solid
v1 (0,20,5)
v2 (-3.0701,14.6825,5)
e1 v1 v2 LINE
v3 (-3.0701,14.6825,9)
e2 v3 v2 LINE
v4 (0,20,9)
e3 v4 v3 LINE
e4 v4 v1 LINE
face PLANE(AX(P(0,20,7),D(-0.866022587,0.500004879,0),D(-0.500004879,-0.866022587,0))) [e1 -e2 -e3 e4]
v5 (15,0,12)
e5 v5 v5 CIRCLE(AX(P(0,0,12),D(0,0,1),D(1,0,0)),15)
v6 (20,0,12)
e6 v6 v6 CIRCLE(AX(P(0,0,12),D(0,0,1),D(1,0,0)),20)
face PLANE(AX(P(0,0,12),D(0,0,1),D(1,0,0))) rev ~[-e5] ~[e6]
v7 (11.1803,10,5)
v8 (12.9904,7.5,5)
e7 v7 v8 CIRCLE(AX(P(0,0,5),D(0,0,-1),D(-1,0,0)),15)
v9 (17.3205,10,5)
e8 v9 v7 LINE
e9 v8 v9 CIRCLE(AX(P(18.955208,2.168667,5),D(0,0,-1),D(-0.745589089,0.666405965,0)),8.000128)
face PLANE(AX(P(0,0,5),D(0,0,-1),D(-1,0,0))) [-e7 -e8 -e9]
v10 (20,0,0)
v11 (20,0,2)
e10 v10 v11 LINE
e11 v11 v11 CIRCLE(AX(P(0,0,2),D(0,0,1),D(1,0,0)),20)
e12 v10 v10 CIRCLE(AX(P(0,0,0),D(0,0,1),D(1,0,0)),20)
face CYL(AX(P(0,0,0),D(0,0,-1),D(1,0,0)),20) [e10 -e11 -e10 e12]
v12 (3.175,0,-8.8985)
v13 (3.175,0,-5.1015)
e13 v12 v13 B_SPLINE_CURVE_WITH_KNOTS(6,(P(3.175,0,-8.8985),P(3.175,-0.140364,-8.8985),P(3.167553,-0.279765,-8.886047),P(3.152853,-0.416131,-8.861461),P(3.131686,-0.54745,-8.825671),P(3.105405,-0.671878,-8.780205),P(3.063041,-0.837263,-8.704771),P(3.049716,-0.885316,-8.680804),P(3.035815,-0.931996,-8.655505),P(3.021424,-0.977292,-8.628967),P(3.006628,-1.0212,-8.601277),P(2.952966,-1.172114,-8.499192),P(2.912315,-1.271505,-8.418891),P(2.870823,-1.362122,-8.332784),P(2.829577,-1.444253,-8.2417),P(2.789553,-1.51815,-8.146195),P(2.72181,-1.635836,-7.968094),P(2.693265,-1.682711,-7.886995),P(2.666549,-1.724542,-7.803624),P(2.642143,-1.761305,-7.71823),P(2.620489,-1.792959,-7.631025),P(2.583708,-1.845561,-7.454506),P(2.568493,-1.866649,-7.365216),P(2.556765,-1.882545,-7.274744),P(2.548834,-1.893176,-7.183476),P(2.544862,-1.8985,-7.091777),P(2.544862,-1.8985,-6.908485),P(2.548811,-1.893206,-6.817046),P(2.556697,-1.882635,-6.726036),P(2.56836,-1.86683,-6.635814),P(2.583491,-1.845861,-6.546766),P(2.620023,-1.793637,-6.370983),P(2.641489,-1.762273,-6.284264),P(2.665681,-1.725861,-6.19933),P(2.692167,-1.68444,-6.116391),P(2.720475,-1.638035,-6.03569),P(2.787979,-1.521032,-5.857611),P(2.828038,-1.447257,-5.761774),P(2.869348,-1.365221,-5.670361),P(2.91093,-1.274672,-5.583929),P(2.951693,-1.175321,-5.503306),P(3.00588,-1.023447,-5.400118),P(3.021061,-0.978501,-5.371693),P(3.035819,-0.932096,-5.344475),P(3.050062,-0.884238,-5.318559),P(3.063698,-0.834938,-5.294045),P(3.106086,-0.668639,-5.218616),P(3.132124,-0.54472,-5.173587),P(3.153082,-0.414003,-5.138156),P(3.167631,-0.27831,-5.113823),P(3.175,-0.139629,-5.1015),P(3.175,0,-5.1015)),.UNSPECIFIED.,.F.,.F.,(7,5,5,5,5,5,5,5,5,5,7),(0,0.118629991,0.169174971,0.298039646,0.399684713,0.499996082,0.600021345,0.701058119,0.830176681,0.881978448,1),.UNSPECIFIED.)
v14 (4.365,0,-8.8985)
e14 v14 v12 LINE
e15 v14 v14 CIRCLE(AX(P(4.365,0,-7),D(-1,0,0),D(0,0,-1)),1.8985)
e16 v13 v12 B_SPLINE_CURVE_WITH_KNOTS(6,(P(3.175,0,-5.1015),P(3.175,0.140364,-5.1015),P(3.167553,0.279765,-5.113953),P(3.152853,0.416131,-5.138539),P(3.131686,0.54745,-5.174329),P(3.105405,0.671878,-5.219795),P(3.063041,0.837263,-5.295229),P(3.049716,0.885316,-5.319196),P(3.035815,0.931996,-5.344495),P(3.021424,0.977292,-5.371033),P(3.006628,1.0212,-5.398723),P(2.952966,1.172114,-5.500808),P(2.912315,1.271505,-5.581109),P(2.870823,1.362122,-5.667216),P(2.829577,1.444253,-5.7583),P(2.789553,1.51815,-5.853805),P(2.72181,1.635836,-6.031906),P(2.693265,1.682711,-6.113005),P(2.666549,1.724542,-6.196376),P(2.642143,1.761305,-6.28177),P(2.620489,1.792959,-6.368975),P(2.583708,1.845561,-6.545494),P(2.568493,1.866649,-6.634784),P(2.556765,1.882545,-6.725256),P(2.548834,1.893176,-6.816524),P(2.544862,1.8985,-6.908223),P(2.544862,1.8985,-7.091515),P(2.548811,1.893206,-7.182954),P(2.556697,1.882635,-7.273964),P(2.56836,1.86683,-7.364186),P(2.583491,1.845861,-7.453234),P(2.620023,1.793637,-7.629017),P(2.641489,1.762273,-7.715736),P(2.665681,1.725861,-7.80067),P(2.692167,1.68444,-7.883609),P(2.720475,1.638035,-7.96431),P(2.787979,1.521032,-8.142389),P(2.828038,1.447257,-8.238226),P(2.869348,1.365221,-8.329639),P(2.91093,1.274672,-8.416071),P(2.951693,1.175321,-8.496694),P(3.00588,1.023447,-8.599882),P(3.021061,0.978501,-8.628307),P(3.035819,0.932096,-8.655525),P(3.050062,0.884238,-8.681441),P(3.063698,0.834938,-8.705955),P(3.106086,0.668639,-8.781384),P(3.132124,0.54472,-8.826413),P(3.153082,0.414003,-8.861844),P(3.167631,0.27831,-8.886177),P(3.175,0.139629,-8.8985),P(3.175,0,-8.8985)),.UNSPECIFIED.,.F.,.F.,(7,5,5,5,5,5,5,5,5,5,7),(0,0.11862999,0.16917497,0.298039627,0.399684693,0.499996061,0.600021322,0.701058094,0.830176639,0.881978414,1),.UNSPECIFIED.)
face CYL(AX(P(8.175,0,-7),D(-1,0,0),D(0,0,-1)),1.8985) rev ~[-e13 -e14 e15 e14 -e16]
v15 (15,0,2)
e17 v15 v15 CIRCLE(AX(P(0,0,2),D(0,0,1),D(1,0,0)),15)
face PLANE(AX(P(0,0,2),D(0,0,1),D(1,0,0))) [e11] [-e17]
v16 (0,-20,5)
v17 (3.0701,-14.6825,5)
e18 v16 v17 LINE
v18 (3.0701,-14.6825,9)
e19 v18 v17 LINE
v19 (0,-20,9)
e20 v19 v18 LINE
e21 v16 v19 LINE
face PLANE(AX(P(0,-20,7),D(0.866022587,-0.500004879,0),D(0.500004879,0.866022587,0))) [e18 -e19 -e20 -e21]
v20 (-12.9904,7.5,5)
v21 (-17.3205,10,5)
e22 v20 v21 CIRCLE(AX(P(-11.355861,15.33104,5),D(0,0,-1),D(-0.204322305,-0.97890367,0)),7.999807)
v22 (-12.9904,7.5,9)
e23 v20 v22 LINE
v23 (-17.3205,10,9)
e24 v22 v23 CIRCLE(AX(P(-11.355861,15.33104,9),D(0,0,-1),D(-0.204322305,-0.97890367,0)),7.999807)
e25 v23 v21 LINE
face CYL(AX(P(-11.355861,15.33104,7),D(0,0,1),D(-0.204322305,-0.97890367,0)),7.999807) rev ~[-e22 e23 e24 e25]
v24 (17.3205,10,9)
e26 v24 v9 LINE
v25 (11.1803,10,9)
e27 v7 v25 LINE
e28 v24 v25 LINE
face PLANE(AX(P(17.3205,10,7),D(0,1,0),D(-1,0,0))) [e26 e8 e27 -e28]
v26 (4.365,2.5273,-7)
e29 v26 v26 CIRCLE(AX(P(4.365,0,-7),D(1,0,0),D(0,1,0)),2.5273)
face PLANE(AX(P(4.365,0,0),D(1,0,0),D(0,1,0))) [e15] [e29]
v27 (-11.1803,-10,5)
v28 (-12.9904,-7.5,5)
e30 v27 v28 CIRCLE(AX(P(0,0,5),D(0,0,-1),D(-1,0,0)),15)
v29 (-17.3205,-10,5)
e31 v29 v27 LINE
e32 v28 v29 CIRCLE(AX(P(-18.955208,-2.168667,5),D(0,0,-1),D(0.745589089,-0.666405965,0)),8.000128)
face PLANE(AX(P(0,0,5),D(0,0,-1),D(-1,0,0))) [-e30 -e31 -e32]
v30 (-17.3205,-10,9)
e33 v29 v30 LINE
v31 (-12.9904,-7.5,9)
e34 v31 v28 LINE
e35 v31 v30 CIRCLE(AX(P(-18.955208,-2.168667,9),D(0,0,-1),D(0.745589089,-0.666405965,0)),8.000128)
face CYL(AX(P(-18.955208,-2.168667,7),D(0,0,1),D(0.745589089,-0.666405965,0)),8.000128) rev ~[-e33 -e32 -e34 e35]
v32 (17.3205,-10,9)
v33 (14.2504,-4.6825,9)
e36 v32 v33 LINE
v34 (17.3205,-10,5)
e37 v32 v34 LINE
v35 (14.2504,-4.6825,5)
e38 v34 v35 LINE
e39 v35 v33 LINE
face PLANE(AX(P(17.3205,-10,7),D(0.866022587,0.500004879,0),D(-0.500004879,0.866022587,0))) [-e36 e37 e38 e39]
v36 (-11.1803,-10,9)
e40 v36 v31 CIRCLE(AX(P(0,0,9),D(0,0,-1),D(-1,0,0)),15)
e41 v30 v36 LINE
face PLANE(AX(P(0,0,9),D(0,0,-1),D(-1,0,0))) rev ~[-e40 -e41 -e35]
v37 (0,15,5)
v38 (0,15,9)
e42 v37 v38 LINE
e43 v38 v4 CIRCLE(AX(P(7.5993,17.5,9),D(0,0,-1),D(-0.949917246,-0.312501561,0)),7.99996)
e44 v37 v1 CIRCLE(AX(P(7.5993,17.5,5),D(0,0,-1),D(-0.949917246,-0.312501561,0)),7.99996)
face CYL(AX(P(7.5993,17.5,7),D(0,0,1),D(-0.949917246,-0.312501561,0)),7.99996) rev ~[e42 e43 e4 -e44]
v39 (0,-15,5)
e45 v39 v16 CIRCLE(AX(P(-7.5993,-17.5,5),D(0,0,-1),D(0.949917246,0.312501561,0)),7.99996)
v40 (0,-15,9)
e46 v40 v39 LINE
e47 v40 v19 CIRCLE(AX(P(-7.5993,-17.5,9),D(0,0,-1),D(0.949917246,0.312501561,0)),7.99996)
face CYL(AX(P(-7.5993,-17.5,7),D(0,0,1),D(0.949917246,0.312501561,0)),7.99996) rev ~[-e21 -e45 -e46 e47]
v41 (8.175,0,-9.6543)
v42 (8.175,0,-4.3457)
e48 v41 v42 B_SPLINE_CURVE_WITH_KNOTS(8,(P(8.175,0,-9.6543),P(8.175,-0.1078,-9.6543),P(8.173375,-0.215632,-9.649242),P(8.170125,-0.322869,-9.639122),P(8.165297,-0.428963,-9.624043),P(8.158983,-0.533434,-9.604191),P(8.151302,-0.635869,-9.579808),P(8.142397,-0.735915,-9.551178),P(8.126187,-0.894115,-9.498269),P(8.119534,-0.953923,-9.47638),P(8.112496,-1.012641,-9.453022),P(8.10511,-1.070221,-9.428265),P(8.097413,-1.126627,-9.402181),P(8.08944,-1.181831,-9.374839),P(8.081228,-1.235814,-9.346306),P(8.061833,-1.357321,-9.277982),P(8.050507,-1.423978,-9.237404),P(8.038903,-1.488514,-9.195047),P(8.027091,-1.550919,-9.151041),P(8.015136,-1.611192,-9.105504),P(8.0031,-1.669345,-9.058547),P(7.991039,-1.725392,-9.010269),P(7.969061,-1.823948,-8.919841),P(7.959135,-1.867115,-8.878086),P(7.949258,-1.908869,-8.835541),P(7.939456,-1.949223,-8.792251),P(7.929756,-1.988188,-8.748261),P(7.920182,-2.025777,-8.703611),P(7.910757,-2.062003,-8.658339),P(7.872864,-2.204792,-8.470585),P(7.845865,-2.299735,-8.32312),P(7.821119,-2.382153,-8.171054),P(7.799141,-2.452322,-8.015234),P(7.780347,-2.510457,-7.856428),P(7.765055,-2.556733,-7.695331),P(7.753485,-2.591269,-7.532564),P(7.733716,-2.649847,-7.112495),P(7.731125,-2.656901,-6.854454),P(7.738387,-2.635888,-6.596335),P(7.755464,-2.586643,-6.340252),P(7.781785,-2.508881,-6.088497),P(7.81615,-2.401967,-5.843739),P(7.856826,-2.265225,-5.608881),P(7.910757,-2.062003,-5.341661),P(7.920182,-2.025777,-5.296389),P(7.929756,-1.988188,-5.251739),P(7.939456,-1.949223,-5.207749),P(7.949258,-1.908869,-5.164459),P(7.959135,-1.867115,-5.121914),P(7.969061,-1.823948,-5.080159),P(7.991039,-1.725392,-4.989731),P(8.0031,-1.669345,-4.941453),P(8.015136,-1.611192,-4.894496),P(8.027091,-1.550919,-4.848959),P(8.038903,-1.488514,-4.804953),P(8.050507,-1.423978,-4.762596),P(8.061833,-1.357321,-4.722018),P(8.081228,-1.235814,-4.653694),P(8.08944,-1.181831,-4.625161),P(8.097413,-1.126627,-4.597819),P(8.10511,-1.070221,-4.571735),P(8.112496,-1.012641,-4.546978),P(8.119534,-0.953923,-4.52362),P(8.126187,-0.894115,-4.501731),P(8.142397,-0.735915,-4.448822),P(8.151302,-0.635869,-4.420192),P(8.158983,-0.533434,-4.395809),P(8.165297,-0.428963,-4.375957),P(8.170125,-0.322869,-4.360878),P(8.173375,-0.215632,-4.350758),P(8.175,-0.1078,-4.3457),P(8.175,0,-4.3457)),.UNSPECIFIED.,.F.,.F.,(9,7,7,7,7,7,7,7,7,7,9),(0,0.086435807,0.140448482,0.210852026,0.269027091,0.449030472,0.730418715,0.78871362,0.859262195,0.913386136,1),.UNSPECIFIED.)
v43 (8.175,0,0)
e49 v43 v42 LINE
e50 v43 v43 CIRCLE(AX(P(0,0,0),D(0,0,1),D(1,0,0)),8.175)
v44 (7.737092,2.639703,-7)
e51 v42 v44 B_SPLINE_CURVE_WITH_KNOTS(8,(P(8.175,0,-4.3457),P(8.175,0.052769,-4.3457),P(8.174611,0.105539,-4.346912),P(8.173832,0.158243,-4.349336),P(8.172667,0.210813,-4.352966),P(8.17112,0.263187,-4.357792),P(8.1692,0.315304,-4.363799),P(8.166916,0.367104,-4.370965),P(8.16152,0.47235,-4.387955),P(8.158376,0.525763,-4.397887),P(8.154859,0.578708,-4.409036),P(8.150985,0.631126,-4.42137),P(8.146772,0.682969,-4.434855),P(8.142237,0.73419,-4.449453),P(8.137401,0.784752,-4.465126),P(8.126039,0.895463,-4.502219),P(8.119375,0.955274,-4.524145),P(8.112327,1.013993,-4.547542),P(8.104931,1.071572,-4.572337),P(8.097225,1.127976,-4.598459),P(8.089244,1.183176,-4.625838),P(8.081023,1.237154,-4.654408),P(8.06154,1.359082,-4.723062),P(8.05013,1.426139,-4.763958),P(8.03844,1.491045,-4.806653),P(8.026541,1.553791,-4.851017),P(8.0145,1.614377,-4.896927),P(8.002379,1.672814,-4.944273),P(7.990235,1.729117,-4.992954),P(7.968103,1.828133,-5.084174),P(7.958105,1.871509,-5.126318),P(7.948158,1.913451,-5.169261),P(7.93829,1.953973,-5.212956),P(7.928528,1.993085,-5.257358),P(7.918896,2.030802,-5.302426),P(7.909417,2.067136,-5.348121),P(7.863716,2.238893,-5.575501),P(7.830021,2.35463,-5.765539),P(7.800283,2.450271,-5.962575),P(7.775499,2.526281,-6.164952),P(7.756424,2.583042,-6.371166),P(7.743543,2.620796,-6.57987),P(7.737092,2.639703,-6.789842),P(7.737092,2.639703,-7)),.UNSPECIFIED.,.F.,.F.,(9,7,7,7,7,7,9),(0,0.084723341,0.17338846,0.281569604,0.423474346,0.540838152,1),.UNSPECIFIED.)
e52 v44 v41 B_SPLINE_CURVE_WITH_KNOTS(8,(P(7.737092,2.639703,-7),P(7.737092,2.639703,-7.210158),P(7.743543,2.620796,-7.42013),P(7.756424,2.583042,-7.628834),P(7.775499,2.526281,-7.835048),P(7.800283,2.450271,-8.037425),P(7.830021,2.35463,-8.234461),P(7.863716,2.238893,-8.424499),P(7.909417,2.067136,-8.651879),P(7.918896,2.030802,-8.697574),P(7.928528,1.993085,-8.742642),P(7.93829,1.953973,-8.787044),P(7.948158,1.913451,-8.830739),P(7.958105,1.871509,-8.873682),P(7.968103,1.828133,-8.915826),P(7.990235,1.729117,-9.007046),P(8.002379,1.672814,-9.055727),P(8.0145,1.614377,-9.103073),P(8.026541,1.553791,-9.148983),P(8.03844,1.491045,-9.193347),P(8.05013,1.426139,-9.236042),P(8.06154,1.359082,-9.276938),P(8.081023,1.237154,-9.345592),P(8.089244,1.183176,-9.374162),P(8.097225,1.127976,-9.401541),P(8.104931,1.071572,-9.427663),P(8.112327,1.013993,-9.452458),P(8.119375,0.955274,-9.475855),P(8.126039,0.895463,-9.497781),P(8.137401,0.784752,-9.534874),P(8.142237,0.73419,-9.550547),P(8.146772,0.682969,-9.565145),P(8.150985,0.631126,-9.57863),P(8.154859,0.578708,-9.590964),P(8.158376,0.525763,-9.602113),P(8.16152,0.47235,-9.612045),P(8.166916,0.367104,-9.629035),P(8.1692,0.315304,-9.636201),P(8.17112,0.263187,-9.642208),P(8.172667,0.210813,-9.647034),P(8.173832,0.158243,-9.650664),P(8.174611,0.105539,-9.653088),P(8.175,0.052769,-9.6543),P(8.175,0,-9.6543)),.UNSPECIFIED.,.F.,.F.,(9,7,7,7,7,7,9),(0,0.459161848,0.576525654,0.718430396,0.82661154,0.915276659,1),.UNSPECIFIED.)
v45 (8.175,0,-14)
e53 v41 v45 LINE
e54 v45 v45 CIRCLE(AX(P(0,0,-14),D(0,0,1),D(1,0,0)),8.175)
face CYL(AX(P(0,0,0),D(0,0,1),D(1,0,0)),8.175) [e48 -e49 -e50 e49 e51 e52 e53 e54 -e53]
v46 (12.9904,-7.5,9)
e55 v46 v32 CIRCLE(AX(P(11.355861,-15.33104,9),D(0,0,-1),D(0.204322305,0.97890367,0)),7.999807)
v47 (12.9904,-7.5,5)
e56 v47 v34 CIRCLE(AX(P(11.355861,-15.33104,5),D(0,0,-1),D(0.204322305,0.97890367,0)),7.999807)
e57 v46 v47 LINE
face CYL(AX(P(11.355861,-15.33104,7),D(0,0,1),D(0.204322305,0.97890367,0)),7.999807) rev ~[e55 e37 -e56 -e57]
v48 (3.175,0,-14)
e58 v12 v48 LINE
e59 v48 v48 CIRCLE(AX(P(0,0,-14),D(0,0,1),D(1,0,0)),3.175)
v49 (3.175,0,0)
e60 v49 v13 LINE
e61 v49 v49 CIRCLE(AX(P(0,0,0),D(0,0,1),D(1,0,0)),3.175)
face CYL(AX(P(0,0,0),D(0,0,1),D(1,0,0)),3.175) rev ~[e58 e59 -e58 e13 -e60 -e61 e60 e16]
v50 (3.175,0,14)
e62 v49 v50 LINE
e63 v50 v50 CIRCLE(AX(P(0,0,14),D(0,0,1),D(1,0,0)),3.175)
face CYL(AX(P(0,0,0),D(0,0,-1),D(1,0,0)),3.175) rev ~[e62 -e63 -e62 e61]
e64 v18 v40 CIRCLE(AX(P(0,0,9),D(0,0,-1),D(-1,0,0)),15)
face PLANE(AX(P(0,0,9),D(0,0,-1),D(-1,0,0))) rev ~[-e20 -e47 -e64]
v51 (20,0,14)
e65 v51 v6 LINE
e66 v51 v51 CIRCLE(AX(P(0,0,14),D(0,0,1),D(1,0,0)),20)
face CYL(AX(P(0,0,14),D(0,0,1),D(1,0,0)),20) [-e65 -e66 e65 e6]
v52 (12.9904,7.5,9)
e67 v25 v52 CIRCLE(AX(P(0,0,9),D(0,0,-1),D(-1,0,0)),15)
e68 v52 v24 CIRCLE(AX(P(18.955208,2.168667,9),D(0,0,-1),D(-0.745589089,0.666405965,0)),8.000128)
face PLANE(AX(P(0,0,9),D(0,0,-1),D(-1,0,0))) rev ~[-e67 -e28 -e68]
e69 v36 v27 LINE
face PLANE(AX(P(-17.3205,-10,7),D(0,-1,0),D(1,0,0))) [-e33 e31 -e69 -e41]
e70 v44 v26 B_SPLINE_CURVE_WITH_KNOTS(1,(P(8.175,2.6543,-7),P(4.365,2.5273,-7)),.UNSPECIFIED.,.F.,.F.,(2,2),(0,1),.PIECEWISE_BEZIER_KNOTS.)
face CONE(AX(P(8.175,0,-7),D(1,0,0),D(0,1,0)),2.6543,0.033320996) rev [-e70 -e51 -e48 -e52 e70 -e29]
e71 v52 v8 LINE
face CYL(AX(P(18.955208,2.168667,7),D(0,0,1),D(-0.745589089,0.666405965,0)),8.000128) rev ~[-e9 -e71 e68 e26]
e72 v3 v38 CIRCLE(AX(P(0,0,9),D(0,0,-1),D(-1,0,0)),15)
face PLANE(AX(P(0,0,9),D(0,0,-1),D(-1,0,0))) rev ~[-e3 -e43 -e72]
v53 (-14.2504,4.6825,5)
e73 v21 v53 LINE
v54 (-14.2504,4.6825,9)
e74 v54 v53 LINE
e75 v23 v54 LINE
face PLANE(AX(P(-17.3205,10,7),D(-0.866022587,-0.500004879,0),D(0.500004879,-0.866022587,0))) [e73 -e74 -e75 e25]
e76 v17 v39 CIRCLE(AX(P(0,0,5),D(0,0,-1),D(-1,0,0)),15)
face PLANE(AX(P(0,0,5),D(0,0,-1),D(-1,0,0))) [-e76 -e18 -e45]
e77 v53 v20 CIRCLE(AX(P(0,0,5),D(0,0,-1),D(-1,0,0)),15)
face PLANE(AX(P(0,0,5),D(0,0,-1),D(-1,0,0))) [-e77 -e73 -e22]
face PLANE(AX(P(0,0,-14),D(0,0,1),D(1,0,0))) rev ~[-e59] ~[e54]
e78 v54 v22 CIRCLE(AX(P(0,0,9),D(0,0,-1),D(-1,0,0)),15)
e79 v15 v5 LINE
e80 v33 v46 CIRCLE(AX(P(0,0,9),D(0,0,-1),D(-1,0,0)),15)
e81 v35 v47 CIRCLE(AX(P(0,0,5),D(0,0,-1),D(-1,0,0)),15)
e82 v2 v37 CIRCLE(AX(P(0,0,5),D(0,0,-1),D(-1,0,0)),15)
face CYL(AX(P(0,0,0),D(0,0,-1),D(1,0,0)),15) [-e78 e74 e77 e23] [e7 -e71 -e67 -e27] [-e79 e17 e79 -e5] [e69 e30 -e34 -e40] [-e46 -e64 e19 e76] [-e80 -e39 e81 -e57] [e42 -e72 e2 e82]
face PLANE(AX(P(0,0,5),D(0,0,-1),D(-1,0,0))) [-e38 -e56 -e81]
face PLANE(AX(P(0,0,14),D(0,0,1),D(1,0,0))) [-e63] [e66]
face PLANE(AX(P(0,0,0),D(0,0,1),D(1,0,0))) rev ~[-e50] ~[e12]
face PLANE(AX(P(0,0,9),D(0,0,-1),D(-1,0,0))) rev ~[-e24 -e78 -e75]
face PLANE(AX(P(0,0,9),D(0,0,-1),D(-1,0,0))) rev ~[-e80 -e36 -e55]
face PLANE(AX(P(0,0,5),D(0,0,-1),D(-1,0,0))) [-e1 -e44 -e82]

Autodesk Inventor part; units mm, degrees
ref_plane "XZ Plane" through (0, 0, 0) normal (0, 1, 0) x (-1, 0, 0)
sketch "Sketch1" plane through (0, 0, 0) normal (0, 0, 1) x (1, 0, 0)
  circle A0 centre (0, 0) radius 15
  circle A1 centre (0, 0) radius 20
  circle A2 centre (0, 0) radius 3.175
  circle A3 centre (0, 0) radius 8.175
  dimension "d18" = 6.35
  dimension "d19" = 16.35
  dimension "d40" = 30
  dimension "d41" = 5
extrude "Extrusion1" add sketch "Sketch1" along normal blind 14 contours A0 | A2 | A3
extrude "Extrusion2" add sketch "Sketch1" along normal blind 2 contours A1
sketch "Sketch2" plane through (0, 0, 14) normal (0, 0, 1) x (1, 0, 0)
  circle A0 centre (0, 0) radius 15 projected
  circle A1 centre (0, 0) radius 20 projected
extrude "Extrusion3" add sketch "Sketch2" against normal blind 2
ref_plane "Work Plane1" through (0, 0, 7) normal (0, 0, -1) x (-1, 0, 0)
extrude "Extrusion5" cut sketch "Sketch1" along normal up to surface (14 mm away) contours A2
extrude "Extrusion6" add sketch "Sketch1" against normal blind 14 contours A3
ref_plane "Work Plane2" through (8.175, 0, 0) normal (1, 0, 0) x (0, 1, 0)
sketch "Sketch9" plane through (0, 0, 7) normal (0, 0, -1) x (-1, 0, 0)
  circle A0 centre (0, 0) radius 15 projected
  line L0 (0, -15) -> (0, -20) construction
  circle A1 centre (0, 0) radius 20 projected
  arc A2 (0, -15) -> (0, -20) centre (7.5993, -17.5) ccw
  line L1 (0, -20) -> (-3.0701, -14.6825)
  circle A3 centre (0, 0) radius 15
  line L2 (12.9904, -7.5) -> (17.3205, -10) construction
  line L3 (17.3205, -10) -> (11.1803, -10)
  arc A4 (12.9904, -7.5) -> (17.3205, -10) centre (18.9551, -2.1688) ccw
  line L4 (12.9904, 7.5) -> (17.3205, 10) construction
  line L5 (17.3205, 10) -> (14.2504, 4.6825)
  arc A5 (12.9904, 7.5) -> (17.3205, 10) centre (11.3558, 15.3312) ccw
  line L6 (0, 15) -> (0, 20) construction
  line L7 (0, 20) -> (3.0701, 14.6825)
  arc A6 (0, 15) -> (0, 20) centre (-7.5993, 17.5) ccw
  line L8 (-12.9904, 7.5) -> (-17.3205, 10) construction
  line L9 (-17.3205, 10) -> (-11.1803, 10)
  arc A7 (-12.9904, 7.5) -> (-17.3205, 10) centre (-18.9551, 2.1688) ccw
  line L10 (-12.9904, -7.5) -> (-17.3205, -10) construction
  line L11 (-17.3205, -10) -> (-14.2504, -4.6825)
  arc A8 (-12.9904, -7.5) -> (-17.3205, -10) centre (-11.3558, -15.3312) ccw
  point P0 (0, -17.5)
  point P1 (15.1554, -8.75)
  point P2 (15.1554, 8.75)
  point P3 (0, 17.5)
  point P4 (-15.1554, 8.75)
  point P5 (-15.1554, -8.75)
  dimension "d58" = 8
  dimension "d59" = 30
  dimension "d62" = 360
extrude "Extrusion9" add sketch "Sketch9" along normal mid plane 4 contours A0 A5 L5 | A4 L3 A0 | A0 A6 L7 | A2 L1 A0 | L9 A0 A7 | L11 A0 A8
sketch "Sketch10" plane through (8.175, 0, 0) normal (1, 0, 0) x (0, 1, 0)
  line L0 (0, 0) -> (0, -14) construction
  line L1 (3.175, -14) -> (-3.175, -14) construction
  circle A0 centre (0, -7) radius 2.6543
  circle A1 centre (0, -7) radius 2.5273
  dimension "d67" = 5.3086
  dimension "d68" = 5.0546
extrude "Extrusion10" cut sketch "Sketch10" against normal blind 3.81 contours A1
loft "Loft1" cut profiles "Sketch10" section 2 edges at (4.365, -2.5273, -7) contours A0 | A1
hole "Hole2" at (8.175, 0, -7) direction (-1, 0, 0) diameter 3.797 end up to surface clearance for "Flat Head Machine Screw (82)" size "#6" standard "Ansi Unified Screw Threads"
properties part number "leverSpindle"
